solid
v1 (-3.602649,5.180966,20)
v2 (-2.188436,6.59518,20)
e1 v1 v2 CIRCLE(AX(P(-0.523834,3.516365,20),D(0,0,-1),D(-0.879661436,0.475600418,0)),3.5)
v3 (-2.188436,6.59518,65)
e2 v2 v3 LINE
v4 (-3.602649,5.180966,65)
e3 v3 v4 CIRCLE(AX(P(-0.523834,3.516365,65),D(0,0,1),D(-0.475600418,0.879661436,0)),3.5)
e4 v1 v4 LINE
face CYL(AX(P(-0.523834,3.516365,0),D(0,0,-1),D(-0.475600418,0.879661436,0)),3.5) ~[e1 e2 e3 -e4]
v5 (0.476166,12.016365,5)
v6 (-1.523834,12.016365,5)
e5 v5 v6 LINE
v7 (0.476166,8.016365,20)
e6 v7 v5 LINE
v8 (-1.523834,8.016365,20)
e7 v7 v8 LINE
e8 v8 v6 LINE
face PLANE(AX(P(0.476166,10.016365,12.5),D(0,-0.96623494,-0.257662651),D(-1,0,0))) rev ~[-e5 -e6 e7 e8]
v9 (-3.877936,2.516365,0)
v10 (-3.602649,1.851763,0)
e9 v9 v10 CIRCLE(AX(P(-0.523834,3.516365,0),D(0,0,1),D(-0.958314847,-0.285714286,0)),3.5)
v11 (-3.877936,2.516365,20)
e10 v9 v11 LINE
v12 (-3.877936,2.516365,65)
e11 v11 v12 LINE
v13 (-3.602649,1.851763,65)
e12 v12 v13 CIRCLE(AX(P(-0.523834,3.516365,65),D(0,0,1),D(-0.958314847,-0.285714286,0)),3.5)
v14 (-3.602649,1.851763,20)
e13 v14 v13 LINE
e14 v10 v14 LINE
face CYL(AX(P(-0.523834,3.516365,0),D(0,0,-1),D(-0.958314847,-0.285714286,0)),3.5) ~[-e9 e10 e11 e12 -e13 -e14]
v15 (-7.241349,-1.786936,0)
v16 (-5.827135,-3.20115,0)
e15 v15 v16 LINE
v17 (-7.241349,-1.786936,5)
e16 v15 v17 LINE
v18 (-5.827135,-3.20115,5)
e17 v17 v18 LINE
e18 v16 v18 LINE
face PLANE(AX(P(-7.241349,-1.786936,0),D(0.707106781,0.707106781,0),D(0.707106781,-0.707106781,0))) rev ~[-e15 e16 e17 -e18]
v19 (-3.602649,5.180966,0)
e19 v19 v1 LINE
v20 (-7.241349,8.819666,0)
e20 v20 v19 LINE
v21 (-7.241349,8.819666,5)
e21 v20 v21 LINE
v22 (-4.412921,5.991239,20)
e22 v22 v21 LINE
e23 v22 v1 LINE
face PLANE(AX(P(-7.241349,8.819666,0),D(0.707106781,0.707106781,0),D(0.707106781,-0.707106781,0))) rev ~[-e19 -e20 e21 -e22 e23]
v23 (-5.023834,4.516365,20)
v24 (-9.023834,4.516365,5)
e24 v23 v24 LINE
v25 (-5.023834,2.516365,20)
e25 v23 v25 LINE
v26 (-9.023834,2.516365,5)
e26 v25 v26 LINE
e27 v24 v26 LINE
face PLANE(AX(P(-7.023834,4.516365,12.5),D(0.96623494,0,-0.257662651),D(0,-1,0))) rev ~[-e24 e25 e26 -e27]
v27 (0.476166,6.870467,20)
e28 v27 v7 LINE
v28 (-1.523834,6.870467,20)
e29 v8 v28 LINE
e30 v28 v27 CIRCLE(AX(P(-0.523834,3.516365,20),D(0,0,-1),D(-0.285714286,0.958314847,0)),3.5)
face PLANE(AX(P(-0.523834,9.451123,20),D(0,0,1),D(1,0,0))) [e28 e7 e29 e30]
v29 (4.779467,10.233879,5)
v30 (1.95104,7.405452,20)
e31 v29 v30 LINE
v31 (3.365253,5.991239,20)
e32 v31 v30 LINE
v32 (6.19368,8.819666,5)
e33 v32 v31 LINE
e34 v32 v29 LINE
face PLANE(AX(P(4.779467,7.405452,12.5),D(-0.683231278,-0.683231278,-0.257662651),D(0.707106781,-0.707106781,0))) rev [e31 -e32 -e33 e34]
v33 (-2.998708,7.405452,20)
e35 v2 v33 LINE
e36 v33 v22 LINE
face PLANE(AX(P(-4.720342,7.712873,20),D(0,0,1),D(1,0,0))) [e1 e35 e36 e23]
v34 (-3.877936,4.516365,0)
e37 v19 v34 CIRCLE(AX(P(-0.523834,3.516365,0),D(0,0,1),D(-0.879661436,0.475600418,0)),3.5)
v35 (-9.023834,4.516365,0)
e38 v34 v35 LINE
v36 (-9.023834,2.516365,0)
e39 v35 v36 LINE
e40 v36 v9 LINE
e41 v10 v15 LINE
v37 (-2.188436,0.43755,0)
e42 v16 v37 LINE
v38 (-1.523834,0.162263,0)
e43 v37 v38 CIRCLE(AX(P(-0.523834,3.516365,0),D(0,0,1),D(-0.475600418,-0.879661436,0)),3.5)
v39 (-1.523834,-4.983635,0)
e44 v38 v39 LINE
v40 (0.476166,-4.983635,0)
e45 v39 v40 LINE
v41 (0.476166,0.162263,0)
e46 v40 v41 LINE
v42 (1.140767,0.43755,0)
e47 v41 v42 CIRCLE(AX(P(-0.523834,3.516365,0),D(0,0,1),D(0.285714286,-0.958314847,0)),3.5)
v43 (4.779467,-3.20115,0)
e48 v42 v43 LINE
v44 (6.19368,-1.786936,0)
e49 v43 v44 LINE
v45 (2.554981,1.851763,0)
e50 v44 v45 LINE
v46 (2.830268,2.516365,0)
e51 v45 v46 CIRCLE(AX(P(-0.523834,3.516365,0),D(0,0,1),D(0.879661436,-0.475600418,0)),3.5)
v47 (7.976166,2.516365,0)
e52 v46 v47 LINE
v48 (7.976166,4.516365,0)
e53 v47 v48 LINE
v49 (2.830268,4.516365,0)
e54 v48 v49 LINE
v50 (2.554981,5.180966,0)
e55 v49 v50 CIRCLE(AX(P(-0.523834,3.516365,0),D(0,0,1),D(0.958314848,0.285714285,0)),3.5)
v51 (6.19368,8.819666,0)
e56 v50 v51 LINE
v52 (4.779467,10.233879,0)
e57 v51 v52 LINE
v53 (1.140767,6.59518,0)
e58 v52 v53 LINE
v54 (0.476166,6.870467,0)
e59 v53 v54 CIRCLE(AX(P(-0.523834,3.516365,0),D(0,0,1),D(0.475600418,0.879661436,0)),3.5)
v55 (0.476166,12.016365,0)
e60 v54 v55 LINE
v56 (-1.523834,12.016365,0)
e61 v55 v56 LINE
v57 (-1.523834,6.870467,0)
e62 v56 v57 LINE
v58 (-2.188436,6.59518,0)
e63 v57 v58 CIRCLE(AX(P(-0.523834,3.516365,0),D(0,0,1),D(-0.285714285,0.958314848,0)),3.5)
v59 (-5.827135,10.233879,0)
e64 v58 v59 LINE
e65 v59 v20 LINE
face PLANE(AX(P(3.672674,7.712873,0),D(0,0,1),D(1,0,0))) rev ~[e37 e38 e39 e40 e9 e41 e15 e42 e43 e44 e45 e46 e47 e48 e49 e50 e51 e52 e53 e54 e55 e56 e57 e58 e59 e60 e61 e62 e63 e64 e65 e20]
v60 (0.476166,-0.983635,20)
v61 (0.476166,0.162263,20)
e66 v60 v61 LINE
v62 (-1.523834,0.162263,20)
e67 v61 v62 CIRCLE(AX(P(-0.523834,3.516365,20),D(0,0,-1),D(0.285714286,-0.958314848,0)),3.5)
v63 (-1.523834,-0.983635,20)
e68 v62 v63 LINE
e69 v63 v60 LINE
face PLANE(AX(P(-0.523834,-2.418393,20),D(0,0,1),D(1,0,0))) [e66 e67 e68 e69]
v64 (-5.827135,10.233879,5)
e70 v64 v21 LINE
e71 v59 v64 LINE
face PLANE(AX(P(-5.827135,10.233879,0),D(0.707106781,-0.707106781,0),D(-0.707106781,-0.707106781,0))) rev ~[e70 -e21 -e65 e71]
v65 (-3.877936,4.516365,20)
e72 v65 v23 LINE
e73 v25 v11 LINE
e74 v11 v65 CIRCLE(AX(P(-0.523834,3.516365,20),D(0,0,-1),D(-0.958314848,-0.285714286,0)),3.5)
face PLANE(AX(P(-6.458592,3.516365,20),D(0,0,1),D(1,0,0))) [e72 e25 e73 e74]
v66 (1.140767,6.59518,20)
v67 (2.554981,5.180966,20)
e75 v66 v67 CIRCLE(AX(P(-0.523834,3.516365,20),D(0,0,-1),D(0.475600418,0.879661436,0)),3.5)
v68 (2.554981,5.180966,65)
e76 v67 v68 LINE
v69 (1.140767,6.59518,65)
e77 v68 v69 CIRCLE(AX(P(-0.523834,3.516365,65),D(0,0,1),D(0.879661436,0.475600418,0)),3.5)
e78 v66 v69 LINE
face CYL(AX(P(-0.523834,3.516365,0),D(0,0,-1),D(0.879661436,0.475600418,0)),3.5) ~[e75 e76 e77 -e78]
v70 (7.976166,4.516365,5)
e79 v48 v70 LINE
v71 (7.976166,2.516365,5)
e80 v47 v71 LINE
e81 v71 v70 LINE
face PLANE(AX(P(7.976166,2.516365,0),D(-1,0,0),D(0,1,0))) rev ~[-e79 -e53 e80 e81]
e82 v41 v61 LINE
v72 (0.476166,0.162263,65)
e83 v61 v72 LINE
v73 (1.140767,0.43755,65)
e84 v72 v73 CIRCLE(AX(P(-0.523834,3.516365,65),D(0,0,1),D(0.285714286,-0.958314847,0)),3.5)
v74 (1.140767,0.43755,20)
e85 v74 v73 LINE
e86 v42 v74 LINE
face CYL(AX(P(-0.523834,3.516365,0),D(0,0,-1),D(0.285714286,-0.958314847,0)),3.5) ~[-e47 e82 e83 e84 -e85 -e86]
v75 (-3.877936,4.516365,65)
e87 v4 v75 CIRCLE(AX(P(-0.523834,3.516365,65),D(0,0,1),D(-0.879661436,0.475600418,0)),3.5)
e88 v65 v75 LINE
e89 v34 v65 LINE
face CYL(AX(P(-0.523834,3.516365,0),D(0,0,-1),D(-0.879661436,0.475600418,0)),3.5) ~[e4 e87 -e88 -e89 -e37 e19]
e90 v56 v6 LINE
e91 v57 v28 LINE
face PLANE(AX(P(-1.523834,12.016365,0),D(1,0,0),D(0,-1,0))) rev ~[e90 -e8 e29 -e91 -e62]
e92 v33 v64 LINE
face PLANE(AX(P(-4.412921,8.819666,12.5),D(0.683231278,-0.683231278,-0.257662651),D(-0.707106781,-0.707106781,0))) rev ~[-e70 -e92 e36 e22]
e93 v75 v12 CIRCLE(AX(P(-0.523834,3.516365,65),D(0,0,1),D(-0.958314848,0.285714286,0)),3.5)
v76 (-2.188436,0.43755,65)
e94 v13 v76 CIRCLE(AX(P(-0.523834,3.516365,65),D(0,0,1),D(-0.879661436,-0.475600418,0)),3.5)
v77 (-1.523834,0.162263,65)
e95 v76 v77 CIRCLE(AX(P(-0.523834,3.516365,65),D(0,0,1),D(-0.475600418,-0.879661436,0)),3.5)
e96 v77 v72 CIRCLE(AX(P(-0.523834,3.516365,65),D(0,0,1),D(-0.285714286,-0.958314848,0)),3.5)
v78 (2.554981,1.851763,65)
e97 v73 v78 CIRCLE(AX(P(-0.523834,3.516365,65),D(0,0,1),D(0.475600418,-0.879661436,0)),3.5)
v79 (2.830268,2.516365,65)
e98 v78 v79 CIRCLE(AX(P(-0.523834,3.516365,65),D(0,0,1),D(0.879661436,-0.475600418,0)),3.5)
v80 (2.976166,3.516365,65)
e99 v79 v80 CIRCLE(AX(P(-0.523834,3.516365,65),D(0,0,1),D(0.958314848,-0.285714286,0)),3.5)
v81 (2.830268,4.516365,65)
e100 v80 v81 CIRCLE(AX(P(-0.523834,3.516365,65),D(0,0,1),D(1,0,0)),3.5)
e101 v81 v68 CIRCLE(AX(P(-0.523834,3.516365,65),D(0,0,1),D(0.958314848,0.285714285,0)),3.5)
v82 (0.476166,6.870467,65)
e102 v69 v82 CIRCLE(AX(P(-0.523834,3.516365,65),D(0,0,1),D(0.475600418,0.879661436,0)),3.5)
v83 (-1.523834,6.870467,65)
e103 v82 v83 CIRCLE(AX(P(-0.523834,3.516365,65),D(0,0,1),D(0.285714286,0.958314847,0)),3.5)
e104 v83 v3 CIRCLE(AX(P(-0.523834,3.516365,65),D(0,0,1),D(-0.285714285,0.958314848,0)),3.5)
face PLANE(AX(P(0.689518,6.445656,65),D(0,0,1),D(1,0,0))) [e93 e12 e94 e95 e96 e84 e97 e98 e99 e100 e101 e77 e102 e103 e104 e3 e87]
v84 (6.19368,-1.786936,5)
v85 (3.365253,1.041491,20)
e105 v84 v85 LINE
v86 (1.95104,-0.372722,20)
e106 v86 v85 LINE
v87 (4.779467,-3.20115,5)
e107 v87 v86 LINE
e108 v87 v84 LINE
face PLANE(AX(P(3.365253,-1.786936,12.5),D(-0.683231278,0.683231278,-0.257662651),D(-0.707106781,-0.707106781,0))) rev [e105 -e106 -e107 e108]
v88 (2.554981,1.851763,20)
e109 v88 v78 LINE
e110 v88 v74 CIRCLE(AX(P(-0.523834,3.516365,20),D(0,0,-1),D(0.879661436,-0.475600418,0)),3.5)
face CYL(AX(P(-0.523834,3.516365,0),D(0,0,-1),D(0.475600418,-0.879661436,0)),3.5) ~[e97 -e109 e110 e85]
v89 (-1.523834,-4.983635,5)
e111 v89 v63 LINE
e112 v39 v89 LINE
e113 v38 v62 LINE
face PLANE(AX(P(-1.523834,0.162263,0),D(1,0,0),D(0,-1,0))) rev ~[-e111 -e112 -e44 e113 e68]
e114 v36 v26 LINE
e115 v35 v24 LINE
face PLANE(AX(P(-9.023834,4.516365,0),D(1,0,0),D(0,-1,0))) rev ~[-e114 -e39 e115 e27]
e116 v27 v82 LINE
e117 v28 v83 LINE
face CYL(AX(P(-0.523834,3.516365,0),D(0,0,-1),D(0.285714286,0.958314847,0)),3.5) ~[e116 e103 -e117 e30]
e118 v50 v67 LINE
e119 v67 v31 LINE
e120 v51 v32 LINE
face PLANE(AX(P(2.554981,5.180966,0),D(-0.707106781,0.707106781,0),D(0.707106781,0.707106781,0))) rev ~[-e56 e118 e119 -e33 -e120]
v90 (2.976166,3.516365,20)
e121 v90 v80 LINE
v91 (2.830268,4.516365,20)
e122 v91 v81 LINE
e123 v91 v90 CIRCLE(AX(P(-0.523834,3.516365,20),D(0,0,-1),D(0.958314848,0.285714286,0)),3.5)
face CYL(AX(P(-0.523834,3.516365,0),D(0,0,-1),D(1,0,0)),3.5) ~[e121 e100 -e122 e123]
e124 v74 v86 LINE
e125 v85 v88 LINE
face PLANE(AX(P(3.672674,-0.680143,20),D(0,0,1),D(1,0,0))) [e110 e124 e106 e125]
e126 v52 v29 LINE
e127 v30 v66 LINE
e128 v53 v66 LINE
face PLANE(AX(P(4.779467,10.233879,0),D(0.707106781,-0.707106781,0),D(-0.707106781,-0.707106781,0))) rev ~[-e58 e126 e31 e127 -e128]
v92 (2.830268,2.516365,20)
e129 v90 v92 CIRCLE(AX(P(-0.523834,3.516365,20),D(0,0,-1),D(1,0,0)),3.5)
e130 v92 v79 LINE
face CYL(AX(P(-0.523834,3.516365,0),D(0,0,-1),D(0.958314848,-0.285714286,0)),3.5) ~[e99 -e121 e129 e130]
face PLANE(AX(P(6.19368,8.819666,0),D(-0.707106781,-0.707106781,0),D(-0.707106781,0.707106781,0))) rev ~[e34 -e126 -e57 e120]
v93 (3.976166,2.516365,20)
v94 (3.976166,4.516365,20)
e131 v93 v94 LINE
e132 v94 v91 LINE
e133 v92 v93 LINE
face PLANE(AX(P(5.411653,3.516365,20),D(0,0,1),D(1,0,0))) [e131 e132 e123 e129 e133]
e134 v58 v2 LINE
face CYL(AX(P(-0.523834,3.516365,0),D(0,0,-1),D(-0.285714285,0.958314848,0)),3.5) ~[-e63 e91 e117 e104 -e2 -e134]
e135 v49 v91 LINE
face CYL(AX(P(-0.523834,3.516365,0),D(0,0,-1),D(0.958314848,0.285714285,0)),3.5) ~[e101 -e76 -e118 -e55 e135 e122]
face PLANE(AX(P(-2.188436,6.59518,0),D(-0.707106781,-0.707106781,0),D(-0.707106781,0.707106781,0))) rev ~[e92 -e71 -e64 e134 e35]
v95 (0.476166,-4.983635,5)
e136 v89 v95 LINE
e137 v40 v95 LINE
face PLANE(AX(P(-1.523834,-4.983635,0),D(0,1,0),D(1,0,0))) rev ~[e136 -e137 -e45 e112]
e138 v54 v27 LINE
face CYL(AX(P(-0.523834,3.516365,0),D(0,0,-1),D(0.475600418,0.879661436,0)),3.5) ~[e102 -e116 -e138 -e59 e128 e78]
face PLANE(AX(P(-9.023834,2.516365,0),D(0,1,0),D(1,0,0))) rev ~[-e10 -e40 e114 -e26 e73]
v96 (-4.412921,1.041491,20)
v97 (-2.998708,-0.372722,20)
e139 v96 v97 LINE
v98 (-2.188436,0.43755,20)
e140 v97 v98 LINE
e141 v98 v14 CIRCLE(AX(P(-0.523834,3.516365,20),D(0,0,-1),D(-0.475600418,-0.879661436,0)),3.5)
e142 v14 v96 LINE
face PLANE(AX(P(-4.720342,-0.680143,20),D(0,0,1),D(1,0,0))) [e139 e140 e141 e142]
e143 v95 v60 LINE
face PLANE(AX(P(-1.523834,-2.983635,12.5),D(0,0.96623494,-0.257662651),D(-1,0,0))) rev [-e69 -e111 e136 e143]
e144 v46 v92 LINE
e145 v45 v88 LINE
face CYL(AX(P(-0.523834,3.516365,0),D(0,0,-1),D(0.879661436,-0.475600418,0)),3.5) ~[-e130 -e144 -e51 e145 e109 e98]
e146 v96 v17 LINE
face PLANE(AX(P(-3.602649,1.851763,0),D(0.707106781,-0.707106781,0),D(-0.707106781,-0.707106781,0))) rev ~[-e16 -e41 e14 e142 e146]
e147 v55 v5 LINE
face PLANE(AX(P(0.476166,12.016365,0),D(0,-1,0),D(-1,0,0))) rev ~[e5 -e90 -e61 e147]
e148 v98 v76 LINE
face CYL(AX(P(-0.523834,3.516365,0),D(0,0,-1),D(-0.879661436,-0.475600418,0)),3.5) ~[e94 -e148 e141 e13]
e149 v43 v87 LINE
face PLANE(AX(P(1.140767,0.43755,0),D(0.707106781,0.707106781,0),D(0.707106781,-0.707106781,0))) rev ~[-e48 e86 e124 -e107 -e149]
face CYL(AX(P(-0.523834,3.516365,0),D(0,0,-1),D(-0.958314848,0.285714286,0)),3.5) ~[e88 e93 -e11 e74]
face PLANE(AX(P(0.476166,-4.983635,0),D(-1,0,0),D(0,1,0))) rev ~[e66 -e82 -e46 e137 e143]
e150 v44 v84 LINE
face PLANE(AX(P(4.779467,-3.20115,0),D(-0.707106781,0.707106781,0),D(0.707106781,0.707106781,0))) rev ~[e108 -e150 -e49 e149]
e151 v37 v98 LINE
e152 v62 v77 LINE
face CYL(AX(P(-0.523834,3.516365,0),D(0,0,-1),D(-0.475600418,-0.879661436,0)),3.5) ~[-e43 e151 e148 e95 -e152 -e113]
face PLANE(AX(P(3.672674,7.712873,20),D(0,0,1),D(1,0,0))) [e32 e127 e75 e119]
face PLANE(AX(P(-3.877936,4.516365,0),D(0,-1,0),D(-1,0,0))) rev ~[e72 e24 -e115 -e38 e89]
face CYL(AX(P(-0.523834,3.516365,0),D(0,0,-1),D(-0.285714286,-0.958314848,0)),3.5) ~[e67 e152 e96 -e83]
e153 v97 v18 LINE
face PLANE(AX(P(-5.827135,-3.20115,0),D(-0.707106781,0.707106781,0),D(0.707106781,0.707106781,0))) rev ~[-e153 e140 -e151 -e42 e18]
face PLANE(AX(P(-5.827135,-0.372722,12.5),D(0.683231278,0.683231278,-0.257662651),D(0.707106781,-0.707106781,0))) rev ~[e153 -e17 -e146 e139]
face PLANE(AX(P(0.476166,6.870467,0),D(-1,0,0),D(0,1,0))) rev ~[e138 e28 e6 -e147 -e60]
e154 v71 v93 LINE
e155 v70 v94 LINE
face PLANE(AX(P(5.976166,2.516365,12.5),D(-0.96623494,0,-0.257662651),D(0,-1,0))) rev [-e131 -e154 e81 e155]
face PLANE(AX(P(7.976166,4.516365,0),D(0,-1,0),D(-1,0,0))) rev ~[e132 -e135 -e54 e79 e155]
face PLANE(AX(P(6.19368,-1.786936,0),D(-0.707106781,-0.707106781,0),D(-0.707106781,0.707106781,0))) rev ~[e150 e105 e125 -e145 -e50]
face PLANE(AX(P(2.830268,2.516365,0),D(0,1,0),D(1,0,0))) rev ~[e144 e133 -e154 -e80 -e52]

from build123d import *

# Parameters (mm, degrees)
F1_DEPTH   = 65
F2_DEPTH   = 20
F3_SIZE2   = 15
F3_SIZE    = 4
F3_2_SIZE2 = 15
F3_2_SIZE  = 4
F3_3_SIZE2 = 15
F3_3_SIZE  = 4
F3_4_SIZE2 = 15
F3_4_SIZE  = 4
F4_SIZE2   = 4
F4_SIZE    = 15
F4_2_SIZE2 = 4
F4_2_SIZE  = 15
F4_3_SIZE2 = 4
F4_3_SIZE  = 15
F4_4_SIZE2 = 4
F4_4_SIZE  = 15


with BuildPart() as f1:
    # F0 (on Top) → F1 (new body)
    with BuildSketch(Plane.XY):
        with BuildLine():
            Line((0.4761658125, 5.9305784088), (1.1407672764, 6.5951798727))
            ThreePointArc((1.1407672764, 6.5951798727), (0.8155578257, 6.7499432102), (0.4761658125, 6.8704668126))
            Line((0.4761658125, 6.8704668126), (0.4761658125, 5.9305784088))
        make_face()
        with BuildLine():
            Line((-3.6026492139, 1.8517633824), (-2.9380477499, 2.5163648464))
            Line((-2.9380477499, 2.5163648464), (-3.8779361538, 2.5163648464))
            ThreePointArc((-3.8779361538, 2.5163648464), (-3.7574125513, 2.1769728331), (-3.6026492139, 1.8517633824))
        make_face()
        with BuildLine():
            ThreePointArc((2.8302677787, 4.5163648464), (2.7097441763, 4.8557568597), (2.5549808388, 5.1809663103))
            Line((2.5549808388, 5.1809663103), (1.8903793748, 4.5163648464))
            Line((1.8903793748, 4.5163648464), (2.8302677787, 4.5163648464))
        make_face()
        with BuildLine():
            Line((-1.5238341875, 0.1622628801), (-1.5238341875, 1.102151284))
            Line((-1.5238341875, 1.102151284), (-2.1884356515, 0.4375498201))
            ThreePointArc((-2.1884356515, 0.4375498201), (-1.8632262008, 0.2827864826), (-1.5238341875, 0.1622628801))
        make_face()
        with BuildLine():
            ThreePointArc((2.5549808388, 5.1809663103), (1.9510395466, 5.9912385805), (1.1407672764, 6.5951798727))
            Line((1.1407672764, 6.5951798727), (0.4761658125, 5.9305784088))
            Line((0.4761658125, 5.9305784088), (0.4761658125, 4.5163648464))
            Line((0.4761658125, 4.5163648464), (1.8903793748, 4.5163648464))
            Line((1.8903793748, 4.5163648464), (2.5549808388, 5.1809663103))
        make_face()
        Polygon((-0.9380477499, 4.5163648464), (-0.5238341875, 4.9305784088), (-1.5238341875, 5.9305784088), (-1.5238341875, 4.5163648464), align=None)
        with BuildLine():
            Line((-1.5238341875, 2.5163648464), (-2.9380477499, 2.5163648464))
            Line((-2.9380477499, 2.5163648464), (-3.6026492139, 1.8517633824))
            ThreePointArc((-3.6026492139, 1.8517633824), (-2.9987079217, 1.0414911122), (-2.1884356515, 0.4375498201))
            Line((-2.1884356515, 0.4375498201), (-1.5238341875, 1.102151284))
            Line((-1.5238341875, 1.102151284), (-1.5238341875, 2.5163648464))
        make_face()
        Polygon((1.8903793748, 2.5163648464), (0.8903793748, 3.5163648464), (0.4761658125, 3.102151284), (0.4761658125, 2.5163648464), align=None)
        Polygon((-0.1096206252, 4.5163648464), (-0.5238341875, 4.9305784088), (-0.9380477499, 4.5163648464), align=None)
        with BuildLine():
            Line((-1.5238341875, 4.5163648464), (-1.5238341875, 5.9305784088))
            Line((-1.5238341875, 5.9305784088), (-2.1884356515, 6.5951798727))
            ThreePointArc((-2.1884356515, 6.5951798727), (-2.9987079217, 5.9912385805), (-3.6026492139, 5.1809663103))
            Line((-3.6026492139, 5.1809663103), (-2.9380477499, 4.5163648464))
            Line((-2.9380477499, 4.5163648464), (-1.5238341875, 4.5163648464))
        make_face()
        Polygon((0.4761658125, 2.5163648464), (0.4761658125, 3.102151284), (-0.1096206252, 2.5163648464), align=None)
        with BuildLine():
            Line((-2.9380477499, 2.5163648464), (-1.9380477499, 3.5163648464))
            Line((-1.9380477499, 3.5163648464), (-2.9380477499, 4.5163648464))
            Line((-2.9380477499, 4.5163648464), (-3.8779361538, 4.5163648464))
            ThreePointArc((-3.8779361538, 4.5163648464), (-4.0238341875, 3.5163648464), (-3.8779361538, 2.5163648464))
            Line((-3.8779361538, 2.5163648464), (-2.9380477499, 2.5163648464))
        make_face()
        with BuildLine():
            Line((-0.5238341875, 4.9305784088), (0.4761658125, 5.9305784088))
            Line((0.4761658125, 5.9305784088), (0.4761658125, 6.8704668126))
            ThreePointArc((0.4761658125, 6.8704668126), (-0.5238341875, 7.0163648464), (-1.5238341875, 6.8704668126))
            Line((-1.5238341875, 6.8704668126), (-1.5238341875, 5.9305784088))
            Line((-1.5238341875, 5.9305784088), (-0.5238341875, 4.9305784088))
        make_face()
        with BuildLine():
            Line((2.8302677787, 4.5163648464), (1.8903793748, 4.5163648464))
            Line((1.8903793748, 4.5163648464), (0.8903793748, 3.5163648464))
            Line((0.8903793748, 3.5163648464), (1.8903793748, 2.5163648464))
            Line((1.8903793748, 2.5163648464), (2.8302677787, 2.5163648464))
            ThreePointArc((2.8302677787, 2.5163648464), (2.9394992415, 3.0110713089), (2.9761658125, 3.5163648464))
            ThreePointArc((2.9761658125, 3.5163648464), (2.9394992415, 4.0216583839), (2.8302677787, 4.5163648464))
        make_face()
        Polygon((-1.5238341875, 3.102151284), (-1.5238341875, 3.9305784088), (-1.9380477499, 3.5163648464), align=None)
        Polygon((0.4761658125, 4.5163648464), (0.4761658125, 5.9305784088), (-0.5238341875, 4.9305784088), (-0.1096206252, 4.5163648464), align=None)
        Polygon((-1.5238341875, 3.9305784088), (-0.9380477499, 4.5163648464), (-1.5238341875, 4.5163648464), align=None)
        with BuildLine():
            Line((2.5549808388, 1.8517633824), (1.8903793748, 2.5163648464))
            Line((1.8903793748, 2.5163648464), (0.4761658125, 2.5163648464))
            Line((0.4761658125, 2.5163648464), (0.4761658125, 1.102151284))
            Line((0.4761658125, 1.102151284), (1.1407672764, 0.4375498201))
            ThreePointArc((1.1407672764, 0.4375498201), (1.9510395466, 1.0414911122), (2.5549808388, 1.8517633824))
        make_face()
        Polygon((0.8903793748, 3.5163648464), (0.4761658125, 3.9305784088), (0.4761658125, 3.102151284), align=None)
        Polygon((-0.1096206252, 4.5163648464), (-0.9380477499, 4.5163648464), (-1.5238341875, 3.9305784088), (-1.5238341875, 3.102151284), (-0.9380477499, 2.5163648464), (-0.1096206252, 2.5163648464), (0.4761658125, 3.102151284), (0.4761658125, 3.9305784088), align=None)
        with BuildLine():
            Line((2.8302677787, 2.5163648464), (1.8903793748, 2.5163648464))
            Line((1.8903793748, 2.5163648464), (2.5549808388, 1.8517633824))
            ThreePointArc((2.5549808388, 1.8517633824), (2.7097441763, 2.1769728331), (2.8302677787, 2.5163648464))
        make_face()
        Polygon((0.4761658125, 3.9305784088), (0.4761658125, 4.5163648464), (-0.1096206252, 4.5163648464), align=None)
        Polygon((-1.9380477499, 3.5163648464), (-1.5238341875, 3.9305784088), (-1.5238341875, 4.5163648464), (-2.9380477499, 4.5163648464), align=None)
        with BuildLine():
            Line((0.4761658125, 1.102151284), (-0.5238341875, 2.102151284))
            Line((-0.5238341875, 2.102151284), (-1.5238341875, 1.102151284))
            Line((-1.5238341875, 1.102151284), (-1.5238341875, 0.1622628801))
            ThreePointArc((-1.5238341875, 0.1622628801), (-0.5238341875, 0.0163648464), (0.4761658125, 0.1622628801))
            Line((0.4761658125, 0.1622628801), (0.4761658125, 1.102151284))
        make_face()
        with BuildLine():
            Line((-1.5238341875, 5.9305784088), (-1.5238341875, 6.8704668126))
            ThreePointArc((-1.5238341875, 6.8704668126), (-1.8632262008, 6.7499432102), (-2.1884356515, 6.5951798727))
            Line((-2.1884356515, 6.5951798727), (-1.5238341875, 5.9305784088))
        make_face()
        Polygon((-1.5238341875, 3.102151284), (-1.9380477499, 3.5163648464), (-2.9380477499, 2.5163648464), (-1.5238341875, 2.5163648464), align=None)
        with BuildLine():
            Line((-2.9380477499, 4.5163648464), (-3.6026492139, 5.1809663103))
            ThreePointArc((-3.6026492139, 5.1809663103), (-3.7574125513, 4.8557568597), (-3.8779361538, 4.5163648464))
            Line((-3.8779361538, 4.5163648464), (-2.9380477499, 4.5163648464))
        make_face()
        Polygon((-0.9380477499, 2.5163648464), (-1.5238341875, 3.102151284), (-1.5238341875, 2.5163648464), align=None)
        Polygon((-0.5238341875, 2.102151284), (-0.9380477499, 2.5163648464), (-1.5238341875, 2.5163648464), (-1.5238341875, 1.102151284), align=None)
        Polygon((-0.5238341875, 2.102151284), (-0.1096206252, 2.5163648464), (-0.9380477499, 2.5163648464), align=None)
        Polygon((0.4761658125, 2.5163648464), (-0.1096206252, 2.5163648464), (-0.5238341875, 2.102151284), (0.4761658125, 1.102151284), align=None)
        Polygon((1.8903793748, 4.5163648464), (0.4761658125, 4.5163648464), (0.4761658125, 3.9305784088), (0.8903793748, 3.5163648464), align=None)
        with BuildLine():
            Line((1.1407672764, 0.4375498201), (0.4761658125, 1.102151284))
            Line((0.4761658125, 1.102151284), (0.4761658125, 0.1622628801))
            ThreePointArc((0.4761658125, 0.1622628801), (0.8155578257, 0.2827864826), (1.1407672764, 0.4375498201))
        make_face()
    extrude(amount=F1_DEPTH)

    # F0 (on Top) → F2 (join)
    with BuildSketch(Plane.XY):
        with BuildLine():
            Line((6.1936802337, 8.8196657053), (4.7794666714, 10.2338792677))
            Line((4.7794666714, 10.2338792677), (1.1407672764, 6.5951798727))
            ThreePointArc((1.1407672764, 6.5951798727), (1.9510395466, 5.9912385805), (2.5549808388, 5.1809663103))
            Line((2.5549808388, 5.1809663103), (6.1936802337, 8.8196657053))
        make_face()
        with BuildLine():
            ThreePointArc((-3.6026492139, 5.1809663103), (-2.9987079217, 5.9912385805), (-2.1884356515, 6.5951798727))
            Line((-2.1884356515, 6.5951798727), (-5.8271350464, 10.2338792677))
            Line((-5.8271350464, 10.2338792677), (-7.2413486088, 8.8196657053))
            Line((-7.2413486088, 8.8196657053), (-3.6026492139, 5.1809663103))
        make_face()
        with BuildLine():
            ThreePointArc((-2.1884356515, 0.4375498201), (-2.9987079217, 1.0414911122), (-3.6026492139, 1.8517633824))
            Line((-3.6026492139, 1.8517633824), (-7.2413486088, -1.7869360125))
            Line((-7.2413486088, -1.7869360125), (-5.8271350464, -3.2011495749))
            Line((-5.8271350464, -3.2011495749), (-2.1884356515, 0.4375498201))
        make_face()
        with BuildLine():
            ThreePointArc((-3.8779361538, 2.5163648464), (-4.0238341875, 3.5163648464), (-3.8779361538, 4.5163648464))
            Line((-3.8779361538, 4.5163648464), (-9.0238341875, 4.5163648464))
            Line((-9.0238341875, 4.5163648464), (-9.0238341875, 2.5163648464))
            Line((-9.0238341875, 2.5163648464), (-3.8779361538, 2.5163648464))
        make_face()
        with BuildLine():
            Line((0.4761658125, -4.9836351536), (0.4761658125, 0.1622628801))
            ThreePointArc((0.4761658125, 0.1622628801), (-0.5238341875, 0.0163648464), (-1.5238341875, 0.1622628801))
            Line((-1.5238341875, 0.1622628801), (-1.5238341875, -4.9836351536))
            Line((-1.5238341875, -4.9836351536), (0.4761658125, -4.9836351536))
        make_face()
        with BuildLine():
            Line((7.9761658125, 4.5163648464), (2.8302677787, 4.5163648464))
            ThreePointArc((2.8302677787, 4.5163648464), (2.9394992415, 4.0216583839), (2.9761658125, 3.5163648464))
            ThreePointArc((2.9761658125, 3.5163648464), (2.9394992415, 3.0110713089), (2.8302677787, 2.5163648464))
            Line((2.8302677787, 2.5163648464), (7.9761658125, 2.5163648464))
            Line((7.9761658125, 2.5163648464), (7.9761658125, 4.5163648464))
        make_face()
        with BuildLine():
            Line((6.1936802337, -1.7869360125), (2.5549808388, 1.8517633824))
            ThreePointArc((2.5549808388, 1.8517633824), (1.9510395466, 1.0414911122), (1.1407672764, 0.4375498201))
            Line((1.1407672764, 0.4375498201), (4.7794666714, -3.2011495749))
            Line((4.7794666714, -3.2011495749), (6.1936802337, -1.7869360125))
        make_face()
        with BuildLine():
            ThreePointArc((-1.5238341875, 6.8704668126), (-0.5238341875, 7.0163648464), (0.4761658125, 6.8704668126))
            Line((0.4761658125, 6.8704668126), (0.4761658125, 12.0163648464))
            Line((0.4761658125, 12.0163648464), (-1.5238341875, 12.0163648464))
            Line((-1.5238341875, 12.0163648464), (-1.5238341875, 6.8704668126))
        make_face()
    extrude(amount=F2_DEPTH)

    # F3
    f3_edges = [f1.edges().sort_by_distance(p)[0] for p in [
        (-6.534242, 9.526772, 20),
    ]]
    f3_side = f1.faces().sort_by_distance((-4.749295, 7.741826, 20))[0]
    chamfer(f3_edges, length=F3_SIZE, length2=F3_SIZE2, reference=f3_side)

    # F3#2
    f3_2_edges = [f1.edges().sort_by_distance(p)[0] for p in [
        (-6.534242, -2.494043, 20),
    ]]
    f3_2_side = f1.faces().sort_by_distance((-4.749295, -0.709096, 20))[0]
    chamfer(f3_2_edges, length=F3_2_SIZE, length2=F3_2_SIZE2, reference=f3_2_side)

    # F3#3
    f3_3_edges = [f1.edges().sort_by_distance(p)[0] for p in [
        (-0.523834, 12.016365, 20),
    ]]
    f3_3_side = f1.faces().sort_by_distance((-0.523834, 9.492069, 20))[0]
    chamfer(f3_3_edges, length=F3_3_SIZE, length2=F3_3_SIZE2, reference=f3_3_side)

    # F3#4
    f3_4_edges = [f1.edges().sort_by_distance(p)[0] for p in [
        (-9.023834, 3.516365, 20),
    ]]
    f3_4_side = f1.faces().sort_by_distance((-6.499538, 3.516365, 20))[0]
    chamfer(f3_4_edges, length=F3_4_SIZE, length2=F3_4_SIZE2, reference=f3_4_side)

    # F4
    f4_edges = [f1.edges().sort_by_distance(p)[0] for p in [
        (5.486573, -2.494043, 20),
    ]]
    f4_side = f1.faces().sort_by_distance((5.486573, -2.494043, 10))[0]
    chamfer(f4_edges, length=F4_SIZE, length2=F4_SIZE2, reference=f4_side)

    # F4#2
    f4_2_edges = [f1.edges().sort_by_distance(p)[0] for p in [
        (5.486573, 9.526772, 20),
    ]]
    f4_2_side = f1.faces().sort_by_distance((5.486573, 9.526772, 10))[0]
    chamfer(f4_2_edges, length=F4_2_SIZE, length2=F4_2_SIZE2, reference=f4_2_side)

    # F4#3
    f4_3_edges = [f1.edges().sort_by_distance(p)[0] for p in [
        (-0.523834, -4.983635, 20),
    ]]
    f4_3_side = f1.faces().sort_by_distance((-0.523834, -4.983635, 10))[0]
    chamfer(f4_3_edges, length=F4_3_SIZE, length2=F4_3_SIZE2, reference=f4_3_side)

    # F4#4
    f4_4_edges = [f1.edges().sort_by_distance(p)[0] for p in [
        (7.976166, 3.516365, 20),
    ]]
    f4_4_side = f1.faces().sort_by_distance((7.976166, 3.516365, 10))[0]
    chamfer(f4_4_edges, length=F4_4_SIZE, length2=F4_4_SIZE2, reference=f4_4_side)


solid = f1.part
